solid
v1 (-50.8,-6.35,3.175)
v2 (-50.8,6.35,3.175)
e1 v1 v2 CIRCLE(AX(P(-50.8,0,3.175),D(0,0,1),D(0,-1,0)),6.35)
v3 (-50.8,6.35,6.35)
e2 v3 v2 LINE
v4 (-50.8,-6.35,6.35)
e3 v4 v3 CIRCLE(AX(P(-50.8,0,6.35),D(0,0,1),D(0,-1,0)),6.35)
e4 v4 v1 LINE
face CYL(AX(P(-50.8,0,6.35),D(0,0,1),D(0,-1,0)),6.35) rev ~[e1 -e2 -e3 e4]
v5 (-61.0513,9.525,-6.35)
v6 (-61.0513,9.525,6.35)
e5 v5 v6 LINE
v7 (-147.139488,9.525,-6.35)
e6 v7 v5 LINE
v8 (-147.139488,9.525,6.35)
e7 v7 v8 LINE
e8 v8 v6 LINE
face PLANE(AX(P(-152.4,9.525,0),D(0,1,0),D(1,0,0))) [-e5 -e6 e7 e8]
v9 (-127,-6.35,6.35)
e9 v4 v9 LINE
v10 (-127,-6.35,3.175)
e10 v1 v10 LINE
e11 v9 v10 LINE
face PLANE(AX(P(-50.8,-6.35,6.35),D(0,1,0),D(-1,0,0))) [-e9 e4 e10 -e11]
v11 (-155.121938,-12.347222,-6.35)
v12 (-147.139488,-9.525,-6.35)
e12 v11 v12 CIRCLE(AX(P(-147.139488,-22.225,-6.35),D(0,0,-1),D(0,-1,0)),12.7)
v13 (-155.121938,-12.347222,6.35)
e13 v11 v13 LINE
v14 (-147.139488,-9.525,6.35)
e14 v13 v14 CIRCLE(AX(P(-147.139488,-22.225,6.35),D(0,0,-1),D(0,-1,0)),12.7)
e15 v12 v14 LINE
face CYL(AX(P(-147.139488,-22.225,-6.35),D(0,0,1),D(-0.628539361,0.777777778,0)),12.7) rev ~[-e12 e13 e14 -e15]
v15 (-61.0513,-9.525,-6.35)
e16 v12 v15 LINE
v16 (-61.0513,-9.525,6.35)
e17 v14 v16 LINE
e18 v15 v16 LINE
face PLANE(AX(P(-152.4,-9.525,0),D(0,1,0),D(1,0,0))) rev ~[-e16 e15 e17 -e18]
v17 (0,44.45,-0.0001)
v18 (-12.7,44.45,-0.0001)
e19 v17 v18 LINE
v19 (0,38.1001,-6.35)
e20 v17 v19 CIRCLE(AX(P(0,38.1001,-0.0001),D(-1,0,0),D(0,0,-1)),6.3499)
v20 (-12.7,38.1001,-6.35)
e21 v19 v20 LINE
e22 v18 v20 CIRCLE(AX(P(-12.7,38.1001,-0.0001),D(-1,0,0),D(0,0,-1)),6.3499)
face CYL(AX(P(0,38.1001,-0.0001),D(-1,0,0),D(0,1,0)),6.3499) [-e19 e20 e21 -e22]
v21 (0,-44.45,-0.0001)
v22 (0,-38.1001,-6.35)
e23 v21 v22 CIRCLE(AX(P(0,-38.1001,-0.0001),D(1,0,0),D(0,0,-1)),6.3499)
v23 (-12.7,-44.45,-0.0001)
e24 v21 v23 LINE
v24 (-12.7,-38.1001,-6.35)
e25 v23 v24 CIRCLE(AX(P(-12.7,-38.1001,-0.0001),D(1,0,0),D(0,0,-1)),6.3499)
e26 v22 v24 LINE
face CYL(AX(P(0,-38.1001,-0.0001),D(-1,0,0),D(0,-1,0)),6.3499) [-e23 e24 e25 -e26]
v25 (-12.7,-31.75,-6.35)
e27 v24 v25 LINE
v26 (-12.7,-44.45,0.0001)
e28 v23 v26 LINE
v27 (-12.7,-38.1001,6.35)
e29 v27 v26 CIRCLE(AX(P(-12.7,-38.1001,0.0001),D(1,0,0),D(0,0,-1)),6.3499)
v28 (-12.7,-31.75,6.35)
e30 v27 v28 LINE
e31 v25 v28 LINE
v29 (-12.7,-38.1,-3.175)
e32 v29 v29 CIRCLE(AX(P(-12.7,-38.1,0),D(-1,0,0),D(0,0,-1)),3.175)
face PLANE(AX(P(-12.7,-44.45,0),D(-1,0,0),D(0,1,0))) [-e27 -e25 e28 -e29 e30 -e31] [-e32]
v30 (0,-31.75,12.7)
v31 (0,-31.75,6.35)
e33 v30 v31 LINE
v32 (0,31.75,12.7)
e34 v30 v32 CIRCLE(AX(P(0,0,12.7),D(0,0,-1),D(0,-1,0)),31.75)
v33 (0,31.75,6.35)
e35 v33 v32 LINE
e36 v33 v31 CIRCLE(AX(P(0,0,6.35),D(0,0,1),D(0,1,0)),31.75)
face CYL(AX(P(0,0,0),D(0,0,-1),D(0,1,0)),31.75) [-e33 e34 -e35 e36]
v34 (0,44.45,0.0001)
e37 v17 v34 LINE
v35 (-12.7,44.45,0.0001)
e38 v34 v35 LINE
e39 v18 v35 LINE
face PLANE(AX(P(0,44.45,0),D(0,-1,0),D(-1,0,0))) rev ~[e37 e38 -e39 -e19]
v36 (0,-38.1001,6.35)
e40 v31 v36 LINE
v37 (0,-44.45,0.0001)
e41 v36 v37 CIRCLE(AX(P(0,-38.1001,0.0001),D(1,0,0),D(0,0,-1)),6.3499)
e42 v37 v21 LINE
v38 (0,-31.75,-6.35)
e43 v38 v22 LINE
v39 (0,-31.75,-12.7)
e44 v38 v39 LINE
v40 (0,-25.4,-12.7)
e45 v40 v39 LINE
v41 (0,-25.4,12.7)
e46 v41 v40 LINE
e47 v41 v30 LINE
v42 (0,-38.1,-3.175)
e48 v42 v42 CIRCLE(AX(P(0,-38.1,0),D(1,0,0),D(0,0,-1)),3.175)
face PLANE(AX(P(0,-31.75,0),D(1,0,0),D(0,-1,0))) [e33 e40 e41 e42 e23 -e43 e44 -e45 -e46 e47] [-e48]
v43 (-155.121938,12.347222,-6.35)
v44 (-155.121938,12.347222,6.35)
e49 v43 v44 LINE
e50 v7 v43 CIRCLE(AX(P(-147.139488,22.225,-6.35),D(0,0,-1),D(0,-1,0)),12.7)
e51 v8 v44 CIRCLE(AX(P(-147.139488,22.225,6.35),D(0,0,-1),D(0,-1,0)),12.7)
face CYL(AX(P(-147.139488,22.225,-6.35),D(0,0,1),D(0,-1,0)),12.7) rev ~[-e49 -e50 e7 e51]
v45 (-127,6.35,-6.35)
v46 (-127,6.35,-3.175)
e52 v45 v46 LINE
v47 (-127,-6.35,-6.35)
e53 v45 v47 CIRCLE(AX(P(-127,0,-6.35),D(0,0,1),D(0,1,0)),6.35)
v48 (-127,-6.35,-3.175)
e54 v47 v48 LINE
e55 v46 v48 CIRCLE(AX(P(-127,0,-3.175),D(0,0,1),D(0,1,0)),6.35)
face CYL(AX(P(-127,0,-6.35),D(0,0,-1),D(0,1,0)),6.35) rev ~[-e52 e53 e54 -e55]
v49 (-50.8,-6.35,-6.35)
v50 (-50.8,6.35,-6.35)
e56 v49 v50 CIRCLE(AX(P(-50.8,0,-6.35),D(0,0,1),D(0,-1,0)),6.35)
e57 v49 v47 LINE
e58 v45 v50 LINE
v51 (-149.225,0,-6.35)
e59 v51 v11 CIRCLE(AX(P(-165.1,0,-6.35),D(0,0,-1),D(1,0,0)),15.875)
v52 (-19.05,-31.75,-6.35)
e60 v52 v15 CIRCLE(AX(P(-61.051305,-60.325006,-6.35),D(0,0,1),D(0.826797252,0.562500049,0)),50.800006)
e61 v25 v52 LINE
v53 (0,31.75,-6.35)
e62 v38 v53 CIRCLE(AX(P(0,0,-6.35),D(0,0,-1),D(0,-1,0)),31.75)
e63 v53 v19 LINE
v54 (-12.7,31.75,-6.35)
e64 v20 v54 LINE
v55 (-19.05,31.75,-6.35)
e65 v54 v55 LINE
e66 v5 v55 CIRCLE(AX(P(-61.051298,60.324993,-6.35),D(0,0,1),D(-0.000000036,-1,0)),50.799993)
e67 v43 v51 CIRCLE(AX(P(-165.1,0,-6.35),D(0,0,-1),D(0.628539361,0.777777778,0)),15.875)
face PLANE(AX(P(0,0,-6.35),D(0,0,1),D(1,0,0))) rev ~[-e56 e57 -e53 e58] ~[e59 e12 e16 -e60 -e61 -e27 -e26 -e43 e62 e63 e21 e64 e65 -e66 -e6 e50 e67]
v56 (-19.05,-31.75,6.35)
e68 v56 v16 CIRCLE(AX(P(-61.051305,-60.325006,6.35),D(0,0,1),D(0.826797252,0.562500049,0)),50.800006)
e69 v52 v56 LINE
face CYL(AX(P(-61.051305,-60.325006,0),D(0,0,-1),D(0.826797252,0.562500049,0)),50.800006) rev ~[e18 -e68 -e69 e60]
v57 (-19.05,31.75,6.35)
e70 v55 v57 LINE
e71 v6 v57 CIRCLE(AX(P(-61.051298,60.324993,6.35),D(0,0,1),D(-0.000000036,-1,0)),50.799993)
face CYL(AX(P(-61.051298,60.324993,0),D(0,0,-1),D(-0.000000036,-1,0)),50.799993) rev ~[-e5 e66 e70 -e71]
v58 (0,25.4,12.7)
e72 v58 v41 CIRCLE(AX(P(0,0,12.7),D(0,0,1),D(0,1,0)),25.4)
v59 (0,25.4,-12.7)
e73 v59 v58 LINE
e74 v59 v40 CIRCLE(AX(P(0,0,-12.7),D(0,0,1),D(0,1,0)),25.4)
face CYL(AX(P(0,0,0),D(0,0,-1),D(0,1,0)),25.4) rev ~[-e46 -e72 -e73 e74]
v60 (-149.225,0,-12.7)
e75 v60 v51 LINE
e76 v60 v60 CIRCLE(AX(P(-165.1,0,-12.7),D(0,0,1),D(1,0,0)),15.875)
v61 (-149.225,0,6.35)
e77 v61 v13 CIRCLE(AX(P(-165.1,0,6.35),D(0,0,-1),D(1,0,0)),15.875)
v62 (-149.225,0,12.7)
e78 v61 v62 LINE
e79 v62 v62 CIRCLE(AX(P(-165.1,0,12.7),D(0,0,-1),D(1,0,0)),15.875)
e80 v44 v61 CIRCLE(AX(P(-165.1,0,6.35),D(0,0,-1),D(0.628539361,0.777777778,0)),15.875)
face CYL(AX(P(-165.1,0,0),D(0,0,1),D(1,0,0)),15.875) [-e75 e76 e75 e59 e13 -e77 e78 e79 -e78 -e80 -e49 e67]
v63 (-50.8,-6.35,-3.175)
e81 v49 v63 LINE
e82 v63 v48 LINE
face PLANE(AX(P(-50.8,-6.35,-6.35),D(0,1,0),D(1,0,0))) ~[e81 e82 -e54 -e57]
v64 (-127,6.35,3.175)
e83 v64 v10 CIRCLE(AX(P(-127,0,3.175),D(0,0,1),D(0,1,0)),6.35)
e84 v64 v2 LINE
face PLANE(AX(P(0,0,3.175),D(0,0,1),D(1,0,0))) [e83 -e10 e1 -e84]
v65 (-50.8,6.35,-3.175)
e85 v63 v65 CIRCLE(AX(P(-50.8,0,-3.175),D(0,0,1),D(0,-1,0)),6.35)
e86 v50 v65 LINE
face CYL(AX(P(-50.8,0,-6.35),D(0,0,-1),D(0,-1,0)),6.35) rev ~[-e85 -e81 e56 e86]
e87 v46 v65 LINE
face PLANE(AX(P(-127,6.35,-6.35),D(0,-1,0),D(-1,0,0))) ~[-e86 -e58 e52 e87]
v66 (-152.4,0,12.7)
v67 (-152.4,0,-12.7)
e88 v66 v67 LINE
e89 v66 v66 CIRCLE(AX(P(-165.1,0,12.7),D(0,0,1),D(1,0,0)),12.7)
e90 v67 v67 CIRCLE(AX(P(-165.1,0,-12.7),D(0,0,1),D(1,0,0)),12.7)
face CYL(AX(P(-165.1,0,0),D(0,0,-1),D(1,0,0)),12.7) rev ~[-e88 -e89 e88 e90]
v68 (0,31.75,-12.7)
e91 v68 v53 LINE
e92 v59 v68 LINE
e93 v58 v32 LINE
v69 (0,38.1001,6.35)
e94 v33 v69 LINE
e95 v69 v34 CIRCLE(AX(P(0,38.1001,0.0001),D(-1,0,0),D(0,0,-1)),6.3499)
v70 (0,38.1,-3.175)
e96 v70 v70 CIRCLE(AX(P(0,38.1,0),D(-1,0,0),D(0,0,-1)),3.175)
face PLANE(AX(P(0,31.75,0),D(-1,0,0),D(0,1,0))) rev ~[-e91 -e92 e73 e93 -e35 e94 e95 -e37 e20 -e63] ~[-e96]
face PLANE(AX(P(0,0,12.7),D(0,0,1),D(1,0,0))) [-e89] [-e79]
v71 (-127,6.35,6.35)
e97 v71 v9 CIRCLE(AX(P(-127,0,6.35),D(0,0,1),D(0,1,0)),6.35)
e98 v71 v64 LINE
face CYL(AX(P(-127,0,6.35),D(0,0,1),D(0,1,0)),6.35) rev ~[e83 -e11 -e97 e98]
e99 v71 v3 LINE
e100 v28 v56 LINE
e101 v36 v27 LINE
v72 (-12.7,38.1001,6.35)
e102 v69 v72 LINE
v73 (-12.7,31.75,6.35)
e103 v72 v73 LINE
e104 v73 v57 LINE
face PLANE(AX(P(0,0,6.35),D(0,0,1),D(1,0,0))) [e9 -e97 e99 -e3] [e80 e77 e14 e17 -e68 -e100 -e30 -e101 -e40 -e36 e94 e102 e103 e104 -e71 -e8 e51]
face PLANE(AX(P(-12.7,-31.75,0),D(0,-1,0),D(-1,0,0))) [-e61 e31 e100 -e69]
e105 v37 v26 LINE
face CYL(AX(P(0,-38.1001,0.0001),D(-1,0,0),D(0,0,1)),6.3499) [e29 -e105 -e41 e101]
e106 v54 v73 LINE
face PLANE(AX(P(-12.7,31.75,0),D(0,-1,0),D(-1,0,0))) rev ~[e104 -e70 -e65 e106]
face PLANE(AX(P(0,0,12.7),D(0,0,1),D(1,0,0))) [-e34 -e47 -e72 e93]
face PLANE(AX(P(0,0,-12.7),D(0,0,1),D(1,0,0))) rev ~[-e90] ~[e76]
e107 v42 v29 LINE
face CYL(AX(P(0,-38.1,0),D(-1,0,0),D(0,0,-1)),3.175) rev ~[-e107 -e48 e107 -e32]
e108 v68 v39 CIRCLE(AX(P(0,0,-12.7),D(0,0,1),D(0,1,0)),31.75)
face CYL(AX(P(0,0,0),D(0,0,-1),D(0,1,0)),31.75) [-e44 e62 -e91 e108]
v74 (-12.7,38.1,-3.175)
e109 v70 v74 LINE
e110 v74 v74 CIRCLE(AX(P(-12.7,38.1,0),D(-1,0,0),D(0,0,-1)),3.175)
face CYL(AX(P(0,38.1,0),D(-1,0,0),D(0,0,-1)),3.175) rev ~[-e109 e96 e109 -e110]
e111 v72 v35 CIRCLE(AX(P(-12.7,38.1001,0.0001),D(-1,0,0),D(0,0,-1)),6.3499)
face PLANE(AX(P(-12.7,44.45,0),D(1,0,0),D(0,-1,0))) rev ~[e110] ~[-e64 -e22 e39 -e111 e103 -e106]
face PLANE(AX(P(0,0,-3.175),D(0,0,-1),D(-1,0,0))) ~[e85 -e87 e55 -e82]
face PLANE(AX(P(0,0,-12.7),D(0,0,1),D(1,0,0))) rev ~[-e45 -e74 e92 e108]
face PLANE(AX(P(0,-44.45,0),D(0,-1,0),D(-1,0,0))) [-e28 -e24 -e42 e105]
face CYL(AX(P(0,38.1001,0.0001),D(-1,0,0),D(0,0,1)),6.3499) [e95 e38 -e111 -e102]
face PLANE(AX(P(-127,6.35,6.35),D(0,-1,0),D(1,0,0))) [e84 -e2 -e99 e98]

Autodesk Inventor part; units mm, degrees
ref_plane "YZ Plane" through (0, 0, 0) normal (1, 0, 0) x (0, 1, 0)
ref_plane "XZ Plane" through (0, 0, 0) normal (0, 1, 0) x (-1, 0, 0)
ref_plane "XY Plane" through (0, 0, 0) normal (0, 0, 1) x (1, 0, 0)
sketch "Sketch1" plane through (0, 0, 0) normal (0, 0, 1) x (1, 0, 0)
  arc A0 (0, 25.4) -> (0, -25.4) centre (0, 0) ccw
  circle A1 centre (-165.1, 0) radius 15.875
  line L0 (-165.1, 0) -> (0, 0) construction
  circle A2 centre (-165.1, 0) radius 12.7
  arc A3 (0, 31.75) -> (0, -31.75) centre (0, 0) ccw
  line L1 (-152.4, 9.525) -> (-61.0513, 9.525)
  line L2 (-152.4, -9.525) -> (-30.2876, -9.525)
  line L3 (0, 25.4) -> (0, 44.45)
  line L4 (0, 44.45) -> (-12.7, 44.45)
  line L5 (-12.7, 44.45) -> (-12.7, 31.75)
  line L6 (-12.7, 31.75) -> (-19.05, 31.75)
  arc A4 (-61.0513, 9.525) -> (-19.05, 31.75) centre (-61.0513, 60.325) ccw
  line L7 (0, -25.4) -> (0, -44.45)
  line L8 (0, -44.45) -> (-12.7, -44.45)
  line L9 (-12.7, -44.45) -> (-12.7, -31.75)
  line L10 (-12.7, -31.75) -> (-19.05, -31.75)
  arc A5 (-19.05, -31.75) -> (-61.0513, -9.525) centre (-61.0513, -60.325) ccw
  point P0 (-6.35, 44.45)
  point P1 (-15.875, 31.75)
  point P2 (-61.0513, -9.525)
  dimension "d0" = 50.8
  dimension "d1" = 31.75
  dimension "d2" = 165.1
  dimension "d3" = 25.4
  dimension "d4" = 63.5
  dimension "d5" = 19.05
  dimension "d6" = 9.525
  dimension "d7" = 44.45
  dimension "d8" = 12.7
  dimension "d10" = 19.05
  dimension "d11" = 31.75
  dimension "d12" = 101.6
extrude "CENTER WEB" add sketch "Sketch1" along normal mid plane 12.7 contours A3 L2 A1 L1 A4 L6 L5 L4 L3 | L7 L8 L9 L10 A5 L2 A3
extrude "END RINGS" add sketch "Sketch1" along normal mid plane 25.4 contours A0 L7 A3 L3 | A1
fillet "Fillet1" radius 12.7 2 edges at (-152.4, 9.525, 0) (-152.4, -9.525, 0)
fillet "Fillet2" radius 6.35 4 edges at (-6.35, 44.45, 6.35) (-6.35, 44.45, -6.35) (-6.35, -44.45, 6.35) (-6.35, -44.45, -6.35)
sketch "Sketch2" plane through (0, 25.4, 12.7) normal (1, 0, 0) x (0, 0, -1)
  arc A0 (19.05, 12.7) -> (6.35, 12.7) centre (12.7, 12.7) ccw projected
  point P0 (12.7, -25.4)
hole "Hole1" at (0, 38.1, 0) direction (-1, 0, 0) diameter 6.35 end through all
mirror "Mirror1" about plane through (0, 0, 0) normal (0, 1, 0) of "Hole1"
sketch "Sketch3" plane through (0, 0, 6.35) normal (0, 0, 1) x (1, 0, 0)
  line L0 (-127, 0) -> (-50.8, 0) construction
  line L1 (-61.0513, -9.525) -> (-147.1395, -9.525) projected
  line L2 (-127, 6.35) -> (-50.8, 6.35)
  line L3 (-50.8, -6.35) -> (-127, -6.35)
  arc A0 (-127, 6.35) -> (-127, -6.35) centre (-127, 0) ccw
  arc A1 (-50.8, -6.35) -> (-50.8, 6.35) centre (-50.8, 0) ccw
  point P0 (0, 0)
  point P1 (-88.9, 0)
  dimension "d27" = 6.35
  dimension "d28" = 76.2
  dimension "d29" = 50.8
  dimension "d30" = 6.35
extrude "RIGHT POCKET" cut sketch "Sketch3" against normal blind 3.175
mirror "Mirror2" about plane through (0, 0, 0) normal (0, 0, 1) of "RIGHT POCKET"
equation "\"d6\" = 0.5 * d5"
properties part number "ANS7-3-BK"
